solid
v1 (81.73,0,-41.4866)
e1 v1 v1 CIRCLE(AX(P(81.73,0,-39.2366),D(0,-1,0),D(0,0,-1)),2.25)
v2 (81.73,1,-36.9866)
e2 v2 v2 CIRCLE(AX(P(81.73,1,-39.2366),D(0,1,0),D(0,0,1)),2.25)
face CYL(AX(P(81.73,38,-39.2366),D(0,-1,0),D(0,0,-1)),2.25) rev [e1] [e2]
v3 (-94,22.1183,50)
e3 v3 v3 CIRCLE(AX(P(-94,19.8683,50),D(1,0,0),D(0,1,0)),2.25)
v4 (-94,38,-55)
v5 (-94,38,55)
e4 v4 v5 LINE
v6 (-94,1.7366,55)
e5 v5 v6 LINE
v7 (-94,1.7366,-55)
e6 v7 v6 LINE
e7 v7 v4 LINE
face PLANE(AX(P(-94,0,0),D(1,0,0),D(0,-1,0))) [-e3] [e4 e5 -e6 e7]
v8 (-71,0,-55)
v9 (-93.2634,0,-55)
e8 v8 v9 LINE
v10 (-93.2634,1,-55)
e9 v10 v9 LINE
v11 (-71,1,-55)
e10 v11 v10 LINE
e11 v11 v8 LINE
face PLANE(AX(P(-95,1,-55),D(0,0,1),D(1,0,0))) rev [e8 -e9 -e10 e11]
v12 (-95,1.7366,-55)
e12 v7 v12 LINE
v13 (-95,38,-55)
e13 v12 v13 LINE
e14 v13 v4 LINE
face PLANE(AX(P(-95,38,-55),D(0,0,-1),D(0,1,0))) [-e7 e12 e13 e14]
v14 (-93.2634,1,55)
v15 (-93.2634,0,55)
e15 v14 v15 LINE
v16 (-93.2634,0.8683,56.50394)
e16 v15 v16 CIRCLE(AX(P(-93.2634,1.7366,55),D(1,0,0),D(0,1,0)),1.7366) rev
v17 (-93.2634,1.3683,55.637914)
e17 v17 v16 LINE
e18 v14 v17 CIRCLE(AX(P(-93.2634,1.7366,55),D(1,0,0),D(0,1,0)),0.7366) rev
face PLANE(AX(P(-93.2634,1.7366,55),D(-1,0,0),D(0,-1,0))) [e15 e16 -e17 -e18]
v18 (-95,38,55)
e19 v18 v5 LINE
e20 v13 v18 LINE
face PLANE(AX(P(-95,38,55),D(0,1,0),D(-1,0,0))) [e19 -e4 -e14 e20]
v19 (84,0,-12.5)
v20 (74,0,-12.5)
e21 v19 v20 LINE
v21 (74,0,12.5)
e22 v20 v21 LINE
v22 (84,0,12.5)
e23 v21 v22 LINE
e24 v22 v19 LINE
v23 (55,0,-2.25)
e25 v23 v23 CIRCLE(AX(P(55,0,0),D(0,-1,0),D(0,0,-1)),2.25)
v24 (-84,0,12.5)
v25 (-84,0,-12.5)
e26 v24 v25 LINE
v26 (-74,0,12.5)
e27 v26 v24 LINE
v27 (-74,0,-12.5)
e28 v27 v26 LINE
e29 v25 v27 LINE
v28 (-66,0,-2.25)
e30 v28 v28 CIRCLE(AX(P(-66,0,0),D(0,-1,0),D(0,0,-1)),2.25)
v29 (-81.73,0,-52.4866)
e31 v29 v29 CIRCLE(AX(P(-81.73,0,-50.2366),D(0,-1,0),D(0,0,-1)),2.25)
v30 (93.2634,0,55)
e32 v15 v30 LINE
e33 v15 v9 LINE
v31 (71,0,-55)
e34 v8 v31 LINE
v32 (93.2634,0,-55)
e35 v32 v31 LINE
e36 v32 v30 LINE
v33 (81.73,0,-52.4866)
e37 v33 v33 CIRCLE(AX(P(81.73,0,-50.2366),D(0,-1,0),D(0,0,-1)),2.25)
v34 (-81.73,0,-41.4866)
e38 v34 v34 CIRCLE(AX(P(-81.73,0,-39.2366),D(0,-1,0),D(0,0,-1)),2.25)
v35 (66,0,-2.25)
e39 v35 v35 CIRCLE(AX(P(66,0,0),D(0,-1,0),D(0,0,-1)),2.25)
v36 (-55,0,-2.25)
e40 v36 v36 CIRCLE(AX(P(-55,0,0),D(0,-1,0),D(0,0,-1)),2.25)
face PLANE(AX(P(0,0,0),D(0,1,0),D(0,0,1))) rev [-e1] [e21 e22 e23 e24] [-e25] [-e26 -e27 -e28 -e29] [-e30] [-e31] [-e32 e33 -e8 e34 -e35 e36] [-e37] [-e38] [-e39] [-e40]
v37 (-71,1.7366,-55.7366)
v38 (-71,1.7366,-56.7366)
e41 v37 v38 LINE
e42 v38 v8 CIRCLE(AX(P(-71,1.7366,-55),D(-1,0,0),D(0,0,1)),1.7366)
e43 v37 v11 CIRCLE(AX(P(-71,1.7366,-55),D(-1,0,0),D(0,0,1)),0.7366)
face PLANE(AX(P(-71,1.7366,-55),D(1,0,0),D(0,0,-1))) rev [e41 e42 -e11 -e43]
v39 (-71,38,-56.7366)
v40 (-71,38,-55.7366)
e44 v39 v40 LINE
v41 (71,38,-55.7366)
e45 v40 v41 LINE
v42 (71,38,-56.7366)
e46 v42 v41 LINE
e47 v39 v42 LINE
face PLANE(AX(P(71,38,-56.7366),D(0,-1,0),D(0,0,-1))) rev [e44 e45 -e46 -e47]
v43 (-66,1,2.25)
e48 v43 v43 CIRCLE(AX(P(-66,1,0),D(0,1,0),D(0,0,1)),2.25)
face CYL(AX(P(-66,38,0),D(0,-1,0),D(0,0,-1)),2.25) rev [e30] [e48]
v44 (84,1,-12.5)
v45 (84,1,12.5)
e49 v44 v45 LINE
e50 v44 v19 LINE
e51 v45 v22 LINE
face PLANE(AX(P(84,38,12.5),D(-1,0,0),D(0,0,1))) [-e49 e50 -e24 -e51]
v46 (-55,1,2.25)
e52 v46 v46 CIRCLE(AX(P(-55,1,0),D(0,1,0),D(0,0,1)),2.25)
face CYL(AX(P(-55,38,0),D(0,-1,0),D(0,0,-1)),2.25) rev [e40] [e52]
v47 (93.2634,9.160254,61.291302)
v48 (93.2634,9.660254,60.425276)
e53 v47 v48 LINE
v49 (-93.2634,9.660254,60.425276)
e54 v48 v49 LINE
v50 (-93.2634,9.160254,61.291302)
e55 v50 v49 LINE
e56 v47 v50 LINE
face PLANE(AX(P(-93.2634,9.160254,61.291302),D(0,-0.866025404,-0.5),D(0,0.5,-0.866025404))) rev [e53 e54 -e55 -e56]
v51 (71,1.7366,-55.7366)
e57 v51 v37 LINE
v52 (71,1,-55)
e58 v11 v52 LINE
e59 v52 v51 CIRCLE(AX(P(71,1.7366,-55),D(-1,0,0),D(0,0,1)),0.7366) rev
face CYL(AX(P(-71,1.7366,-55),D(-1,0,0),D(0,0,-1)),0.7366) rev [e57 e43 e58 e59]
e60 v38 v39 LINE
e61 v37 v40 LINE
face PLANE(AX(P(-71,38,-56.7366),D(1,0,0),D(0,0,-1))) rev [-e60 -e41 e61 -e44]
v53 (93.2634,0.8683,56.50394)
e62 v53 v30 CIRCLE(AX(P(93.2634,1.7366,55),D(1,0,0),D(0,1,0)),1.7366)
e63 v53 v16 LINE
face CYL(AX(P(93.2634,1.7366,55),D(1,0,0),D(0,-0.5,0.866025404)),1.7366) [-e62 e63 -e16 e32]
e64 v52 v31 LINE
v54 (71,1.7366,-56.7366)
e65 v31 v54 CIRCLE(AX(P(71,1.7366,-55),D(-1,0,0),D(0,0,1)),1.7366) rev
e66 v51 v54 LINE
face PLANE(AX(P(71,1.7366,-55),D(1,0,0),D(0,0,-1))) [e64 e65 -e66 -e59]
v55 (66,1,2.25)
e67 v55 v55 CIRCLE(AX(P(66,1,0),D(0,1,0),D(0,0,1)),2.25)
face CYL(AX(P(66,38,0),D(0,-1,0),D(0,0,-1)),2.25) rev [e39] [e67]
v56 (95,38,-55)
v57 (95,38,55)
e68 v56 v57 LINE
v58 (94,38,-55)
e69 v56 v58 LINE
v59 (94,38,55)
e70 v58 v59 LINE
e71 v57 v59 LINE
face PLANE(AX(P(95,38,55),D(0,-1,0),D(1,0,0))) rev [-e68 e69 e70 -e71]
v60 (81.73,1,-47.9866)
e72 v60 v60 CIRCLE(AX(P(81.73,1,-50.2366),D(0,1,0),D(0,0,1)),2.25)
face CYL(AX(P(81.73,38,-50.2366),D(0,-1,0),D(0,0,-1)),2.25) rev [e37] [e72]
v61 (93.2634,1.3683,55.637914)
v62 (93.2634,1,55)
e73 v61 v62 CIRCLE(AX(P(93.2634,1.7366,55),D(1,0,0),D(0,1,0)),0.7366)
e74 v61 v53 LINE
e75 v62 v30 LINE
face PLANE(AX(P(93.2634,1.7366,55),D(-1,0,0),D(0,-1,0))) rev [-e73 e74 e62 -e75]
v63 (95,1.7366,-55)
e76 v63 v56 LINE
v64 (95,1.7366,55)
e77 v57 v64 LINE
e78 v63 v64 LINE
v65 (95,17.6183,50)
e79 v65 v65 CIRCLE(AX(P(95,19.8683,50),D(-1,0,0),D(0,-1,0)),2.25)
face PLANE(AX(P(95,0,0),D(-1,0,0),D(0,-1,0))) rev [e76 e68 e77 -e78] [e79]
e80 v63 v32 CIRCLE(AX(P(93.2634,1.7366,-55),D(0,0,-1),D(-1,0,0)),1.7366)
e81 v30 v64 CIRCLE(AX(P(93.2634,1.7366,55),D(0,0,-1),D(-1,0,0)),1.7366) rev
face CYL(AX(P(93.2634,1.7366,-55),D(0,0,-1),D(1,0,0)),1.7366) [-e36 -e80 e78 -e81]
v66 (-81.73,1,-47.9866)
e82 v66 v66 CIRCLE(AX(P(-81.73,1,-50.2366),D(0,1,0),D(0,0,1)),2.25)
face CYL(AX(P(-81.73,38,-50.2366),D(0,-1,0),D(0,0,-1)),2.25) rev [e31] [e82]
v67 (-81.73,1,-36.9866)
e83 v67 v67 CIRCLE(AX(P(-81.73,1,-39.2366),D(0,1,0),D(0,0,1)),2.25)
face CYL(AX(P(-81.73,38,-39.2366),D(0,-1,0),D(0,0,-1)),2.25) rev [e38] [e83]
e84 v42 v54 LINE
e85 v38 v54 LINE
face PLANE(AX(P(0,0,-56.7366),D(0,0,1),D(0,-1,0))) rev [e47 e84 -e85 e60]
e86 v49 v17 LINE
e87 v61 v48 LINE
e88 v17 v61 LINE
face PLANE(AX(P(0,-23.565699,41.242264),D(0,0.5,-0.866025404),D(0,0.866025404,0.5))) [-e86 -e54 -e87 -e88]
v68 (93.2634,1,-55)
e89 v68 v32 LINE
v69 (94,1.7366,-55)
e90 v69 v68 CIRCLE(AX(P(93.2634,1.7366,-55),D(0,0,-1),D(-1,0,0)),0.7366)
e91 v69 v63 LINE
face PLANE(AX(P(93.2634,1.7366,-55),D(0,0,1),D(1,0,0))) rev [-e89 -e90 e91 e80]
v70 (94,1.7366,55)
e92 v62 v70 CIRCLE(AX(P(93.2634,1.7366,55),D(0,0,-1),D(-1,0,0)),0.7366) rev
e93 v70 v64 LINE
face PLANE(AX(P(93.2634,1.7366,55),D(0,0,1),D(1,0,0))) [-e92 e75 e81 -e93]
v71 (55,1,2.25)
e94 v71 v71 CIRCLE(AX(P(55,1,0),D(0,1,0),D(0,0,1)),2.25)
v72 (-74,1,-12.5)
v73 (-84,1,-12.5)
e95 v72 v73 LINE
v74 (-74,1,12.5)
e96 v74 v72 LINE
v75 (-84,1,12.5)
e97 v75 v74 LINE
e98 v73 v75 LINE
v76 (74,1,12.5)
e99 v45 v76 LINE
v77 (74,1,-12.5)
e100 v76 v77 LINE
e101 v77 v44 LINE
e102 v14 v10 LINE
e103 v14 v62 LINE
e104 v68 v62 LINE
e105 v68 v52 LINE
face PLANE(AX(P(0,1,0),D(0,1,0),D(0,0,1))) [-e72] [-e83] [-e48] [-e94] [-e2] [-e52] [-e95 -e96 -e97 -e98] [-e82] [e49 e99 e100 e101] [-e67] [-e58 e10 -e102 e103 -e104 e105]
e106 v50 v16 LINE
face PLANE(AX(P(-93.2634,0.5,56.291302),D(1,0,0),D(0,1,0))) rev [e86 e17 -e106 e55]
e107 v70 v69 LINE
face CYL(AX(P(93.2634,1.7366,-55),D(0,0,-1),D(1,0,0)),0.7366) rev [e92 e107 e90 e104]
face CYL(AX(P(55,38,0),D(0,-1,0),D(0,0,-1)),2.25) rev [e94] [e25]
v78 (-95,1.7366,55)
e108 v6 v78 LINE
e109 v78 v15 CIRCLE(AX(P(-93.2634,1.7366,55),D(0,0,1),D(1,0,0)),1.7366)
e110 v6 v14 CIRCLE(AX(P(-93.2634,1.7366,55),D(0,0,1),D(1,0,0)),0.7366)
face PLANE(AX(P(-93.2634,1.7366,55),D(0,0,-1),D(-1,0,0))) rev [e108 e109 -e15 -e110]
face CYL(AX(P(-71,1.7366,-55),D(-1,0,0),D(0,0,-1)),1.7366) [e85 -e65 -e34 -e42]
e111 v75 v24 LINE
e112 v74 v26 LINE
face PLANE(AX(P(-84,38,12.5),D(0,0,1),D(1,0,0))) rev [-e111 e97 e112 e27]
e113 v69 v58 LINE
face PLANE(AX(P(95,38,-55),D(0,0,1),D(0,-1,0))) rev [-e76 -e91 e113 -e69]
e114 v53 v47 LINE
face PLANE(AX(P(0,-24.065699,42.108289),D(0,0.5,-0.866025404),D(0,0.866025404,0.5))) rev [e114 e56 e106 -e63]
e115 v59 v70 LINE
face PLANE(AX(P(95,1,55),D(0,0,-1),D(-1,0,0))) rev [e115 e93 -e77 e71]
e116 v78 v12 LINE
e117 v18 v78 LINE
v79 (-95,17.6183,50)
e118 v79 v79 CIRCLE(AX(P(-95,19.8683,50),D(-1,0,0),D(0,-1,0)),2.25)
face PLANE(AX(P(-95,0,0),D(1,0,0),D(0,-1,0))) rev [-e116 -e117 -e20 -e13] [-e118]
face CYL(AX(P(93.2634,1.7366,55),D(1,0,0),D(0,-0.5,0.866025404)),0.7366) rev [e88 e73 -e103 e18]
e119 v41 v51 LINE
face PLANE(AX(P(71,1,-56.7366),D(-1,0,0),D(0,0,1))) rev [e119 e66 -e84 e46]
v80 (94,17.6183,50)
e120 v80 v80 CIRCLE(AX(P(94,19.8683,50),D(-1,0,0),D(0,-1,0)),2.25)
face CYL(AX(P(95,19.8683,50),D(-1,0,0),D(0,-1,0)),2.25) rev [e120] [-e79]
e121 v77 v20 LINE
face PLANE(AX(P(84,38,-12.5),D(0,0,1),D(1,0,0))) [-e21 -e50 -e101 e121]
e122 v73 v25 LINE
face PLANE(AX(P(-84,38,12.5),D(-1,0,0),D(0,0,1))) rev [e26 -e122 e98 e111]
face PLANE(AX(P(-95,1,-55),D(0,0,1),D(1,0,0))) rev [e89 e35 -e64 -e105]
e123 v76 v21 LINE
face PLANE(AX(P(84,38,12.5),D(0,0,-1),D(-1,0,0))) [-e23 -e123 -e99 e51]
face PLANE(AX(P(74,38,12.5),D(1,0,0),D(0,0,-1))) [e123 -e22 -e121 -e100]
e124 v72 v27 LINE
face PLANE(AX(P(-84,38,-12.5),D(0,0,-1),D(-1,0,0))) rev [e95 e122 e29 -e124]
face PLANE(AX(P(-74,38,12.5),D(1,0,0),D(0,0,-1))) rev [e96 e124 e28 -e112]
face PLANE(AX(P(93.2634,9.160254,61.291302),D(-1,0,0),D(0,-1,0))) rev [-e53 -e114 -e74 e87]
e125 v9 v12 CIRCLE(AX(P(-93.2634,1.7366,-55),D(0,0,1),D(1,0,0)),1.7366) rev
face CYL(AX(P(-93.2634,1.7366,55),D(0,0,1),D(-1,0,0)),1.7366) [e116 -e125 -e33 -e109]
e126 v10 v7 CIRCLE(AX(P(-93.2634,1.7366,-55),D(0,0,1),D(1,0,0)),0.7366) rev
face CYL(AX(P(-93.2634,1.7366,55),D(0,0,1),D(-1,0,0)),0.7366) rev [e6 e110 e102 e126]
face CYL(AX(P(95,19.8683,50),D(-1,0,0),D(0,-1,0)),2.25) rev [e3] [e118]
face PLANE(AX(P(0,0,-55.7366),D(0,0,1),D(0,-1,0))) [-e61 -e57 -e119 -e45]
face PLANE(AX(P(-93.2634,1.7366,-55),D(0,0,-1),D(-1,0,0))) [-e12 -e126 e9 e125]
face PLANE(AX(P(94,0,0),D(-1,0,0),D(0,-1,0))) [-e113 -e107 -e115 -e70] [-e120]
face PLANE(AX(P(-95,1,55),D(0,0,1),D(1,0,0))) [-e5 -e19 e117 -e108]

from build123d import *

# Parameters (mm, degrees)
SKETCH2_W                    = 190
SKETCH2_H                    = 110
BASE_FLANGE1_DEPTH           = 1
EDGE_FLANGE1_STRIP_W         = 5.4732
EDGE_FLANGE1_STRIP_H         = 1
EDGE_FLANGE1_STRIP_CUT_DEPTH = 110
EDGE_FLANGE1_DEPTH           = 110
SKETCH16_R                   = 2.25
CUT_EXTRUDE1_DEPTH           = 117.163677628
SKETCH17_W                   = 10
SKETCH17_H                   = 25
CUT_EXTRUDE2_DEPTH           = 117.163677628
EDGE_FLANGE2_DEPTH           = 142
EDGE_FLANGE3_DEPTH           = 186.5268
SKETCH29_R                   = 2.25
CUT_EXTRUDE3_DEPTH           = 204.225548722
SKETCH30_R                   = 2.25
CUT_EXTRUDE4_DEPTH           = 120.271218881


# Sheet-metal steps are written as plain solids
with BuildPart() as part:
    # Sketch2 → Base-Flange1 (new body)
    with BuildSketch(Plane(origin=(0, 0, 0), x_dir=(1, 0, 0), z_dir=(0, 1, 0))):
        Rectangle(SKETCH2_W, SKETCH2_H)
    extrude(amount=BASE_FLANGE1_DEPTH)

    # Edge-Flange1 strip (across the edge) → Edge-Flange1 strip cut (cut)
    with BuildSketch(Plane(origin=(95, 1, 55), x_dir=(-1, 0, 0), z_dir=(0, 0, -1))):
        with Locations((-1, -0.5)):
            Rectangle(EDGE_FLANGE1_STRIP_W, EDGE_FLANGE1_STRIP_H)
    edge_flange1_strip_cut = extrude(amount=EDGE_FLANGE1_STRIP_CUT_DEPTH, mode=Mode.SUBTRACT)

    # Edge-Flange1 section (across the edge) → Edge-Flange1 (add)
    with BuildSketch(Plane(origin=(95, 1, 55), x_dir=(-1, 0, 0), z_dir=(0, 0, -1))):
        with BuildLine():
            Line((0, 0.7366), (0, 37))
            Line((0, 37), (1, 37))
            Line((1, 37), (1, 0.7366))
            ThreePointArc((1, 0.7366), (1.215745145, 0.215745145), (1.7366, 0))
            Line((1.7366, 0), (1.7366, -1))
            ThreePointArc((1.7366, -1), (0.508638364, -0.491361636), (0, 0.7366))
        make_face()
    edge_flange1 = extrude(amount=EDGE_FLANGE1_DEPTH)

    # Mirror1: Edge-Flange1 strip cut, Edge-Flange1 across plane
    add(edge_flange1_strip_cut.mirror(Plane(origin=(0, 0, 0), x_dir=(0, 0, 1), z_dir=(1, 0, 0))), mode=Mode.SUBTRACT)
    add(edge_flange1.mirror(Plane(origin=(0, 0, 0), x_dir=(0, 0, 1), z_dir=(1, 0, 0))))

    # Sketch16 → Cut-Extrude1 (cut, through all)
    with BuildSketch(Plane.XZ):
        with Locations(Location((-55, 0, 0), (0, 0, 270))):
            Circle(SKETCH16_R)
        with Locations(Location((55, 0, 0), (0, 0, 270))):
            Circle(SKETCH16_R)
        with Locations(Location((66, 0, 0), (0, 0, 270))):
            Circle(SKETCH16_R)
        with Locations(Location((-66, 0, 0), (0, 0, 270))):
            Circle(SKETCH16_R)
    extrude(amount=-CUT_EXTRUDE1_DEPTH, mode=Mode.SUBTRACT)

    # Sketch17 → Cut-Extrude2 (cut, through all)
    with BuildSketch(Plane.XZ):
        with Locations((-79, 0)):
            Rectangle(SKETCH17_W, SKETCH17_H)
    cut_extrude2 = extrude(amount=-CUT_EXTRUDE2_DEPTH, mode=Mode.SUBTRACT)

    # Mirror2: Cut-Extrude2 across plane
    add(cut_extrude2.mirror(Plane(origin=(0, 0, 0), x_dir=(0, 0, 1), z_dir=(1, 0, 0))), mode=Mode.SUBTRACT)

    # Edge-Flange2 section (across the edge) → Edge-Flange2 (add)
    with BuildSketch(Plane(origin=(71, 1, -55.7366), x_dir=(0, 0, 1), z_dir=(-1, 0, 0))):
        with BuildLine():
            Line((-1, 0.7366), (-1, 37))
            Line((-1, 37), (0, 37))
            Line((0, 37), (0, 0.7366))
            ThreePointArc((0, 0.7366), (0.215745145, 0.215745145), (0.7366, 0))
            Line((0.7366, 0), (0.7366, -1))
            ThreePointArc((0.7366, -1), (-0.491361636, -0.491361636), (-1, 0.7366))
        make_face()
    extrude(amount=EDGE_FLANGE2_DEPTH)

    # Edge-Flange3 section (across the edge) → Edge-Flange3 (add)
    with BuildSketch(Plane(origin=(-93.2634, 1, 55.425276208), x_dir=(0, 0.5000000000000041, -0.8660254037844364), z_dir=(1, 0, 0))):
        with BuildLine():
            Line((-1, 0.425276208), (-1, 10))
            Line((-1, 10), (0, 10))
            Line((0, 10), (0, 0.425276208))
            ThreePointArc((0, 0.425276208), (0.098685688, 0.056976208), (0.3683, -0.212638104))
            Line((0.3683, -0.212638104), (-0.1317, -1.078663508))
            ThreePointArc((-0.1317, -1.078663508), (-0.767339716, -0.443023792), (-1, 0.425276208))
        make_face()
    extrude(amount=EDGE_FLANGE3_DEPTH)

    # Sketch29 → Cut-Extrude3 (cut, through all)
    with BuildSketch(Plane.ZY.offset(95)):
        with Locations(Location((50, 19.8683, 0), (0, 0, 270))):
            Circle(SKETCH29_R)
    extrude(amount=-CUT_EXTRUDE3_DEPTH, mode=Mode.SUBTRACT)

    # Sketch30 → Cut-Extrude4 (cut, through all)
    with BuildSketch(Plane.XZ):
        with Locations(Location((81.73, -39.2366, 0), (0, 0, 270))):
            Circle(SKETCH30_R)
        with Locations(Location((81.73, -50.2366, 0), (0, 0, 270))):
            Circle(SKETCH30_R)
        with Locations(Location((-81.73, -39.2366, 0), (0, 0, 270))):
            Circle(SKETCH30_R)
        with Locations(Location((-81.73, -50.2366, 0), (0, 0, 270))):
            Circle(SKETCH30_R)
    extrude(amount=-CUT_EXTRUDE4_DEPTH, mode=Mode.SUBTRACT)


solid = part.part
